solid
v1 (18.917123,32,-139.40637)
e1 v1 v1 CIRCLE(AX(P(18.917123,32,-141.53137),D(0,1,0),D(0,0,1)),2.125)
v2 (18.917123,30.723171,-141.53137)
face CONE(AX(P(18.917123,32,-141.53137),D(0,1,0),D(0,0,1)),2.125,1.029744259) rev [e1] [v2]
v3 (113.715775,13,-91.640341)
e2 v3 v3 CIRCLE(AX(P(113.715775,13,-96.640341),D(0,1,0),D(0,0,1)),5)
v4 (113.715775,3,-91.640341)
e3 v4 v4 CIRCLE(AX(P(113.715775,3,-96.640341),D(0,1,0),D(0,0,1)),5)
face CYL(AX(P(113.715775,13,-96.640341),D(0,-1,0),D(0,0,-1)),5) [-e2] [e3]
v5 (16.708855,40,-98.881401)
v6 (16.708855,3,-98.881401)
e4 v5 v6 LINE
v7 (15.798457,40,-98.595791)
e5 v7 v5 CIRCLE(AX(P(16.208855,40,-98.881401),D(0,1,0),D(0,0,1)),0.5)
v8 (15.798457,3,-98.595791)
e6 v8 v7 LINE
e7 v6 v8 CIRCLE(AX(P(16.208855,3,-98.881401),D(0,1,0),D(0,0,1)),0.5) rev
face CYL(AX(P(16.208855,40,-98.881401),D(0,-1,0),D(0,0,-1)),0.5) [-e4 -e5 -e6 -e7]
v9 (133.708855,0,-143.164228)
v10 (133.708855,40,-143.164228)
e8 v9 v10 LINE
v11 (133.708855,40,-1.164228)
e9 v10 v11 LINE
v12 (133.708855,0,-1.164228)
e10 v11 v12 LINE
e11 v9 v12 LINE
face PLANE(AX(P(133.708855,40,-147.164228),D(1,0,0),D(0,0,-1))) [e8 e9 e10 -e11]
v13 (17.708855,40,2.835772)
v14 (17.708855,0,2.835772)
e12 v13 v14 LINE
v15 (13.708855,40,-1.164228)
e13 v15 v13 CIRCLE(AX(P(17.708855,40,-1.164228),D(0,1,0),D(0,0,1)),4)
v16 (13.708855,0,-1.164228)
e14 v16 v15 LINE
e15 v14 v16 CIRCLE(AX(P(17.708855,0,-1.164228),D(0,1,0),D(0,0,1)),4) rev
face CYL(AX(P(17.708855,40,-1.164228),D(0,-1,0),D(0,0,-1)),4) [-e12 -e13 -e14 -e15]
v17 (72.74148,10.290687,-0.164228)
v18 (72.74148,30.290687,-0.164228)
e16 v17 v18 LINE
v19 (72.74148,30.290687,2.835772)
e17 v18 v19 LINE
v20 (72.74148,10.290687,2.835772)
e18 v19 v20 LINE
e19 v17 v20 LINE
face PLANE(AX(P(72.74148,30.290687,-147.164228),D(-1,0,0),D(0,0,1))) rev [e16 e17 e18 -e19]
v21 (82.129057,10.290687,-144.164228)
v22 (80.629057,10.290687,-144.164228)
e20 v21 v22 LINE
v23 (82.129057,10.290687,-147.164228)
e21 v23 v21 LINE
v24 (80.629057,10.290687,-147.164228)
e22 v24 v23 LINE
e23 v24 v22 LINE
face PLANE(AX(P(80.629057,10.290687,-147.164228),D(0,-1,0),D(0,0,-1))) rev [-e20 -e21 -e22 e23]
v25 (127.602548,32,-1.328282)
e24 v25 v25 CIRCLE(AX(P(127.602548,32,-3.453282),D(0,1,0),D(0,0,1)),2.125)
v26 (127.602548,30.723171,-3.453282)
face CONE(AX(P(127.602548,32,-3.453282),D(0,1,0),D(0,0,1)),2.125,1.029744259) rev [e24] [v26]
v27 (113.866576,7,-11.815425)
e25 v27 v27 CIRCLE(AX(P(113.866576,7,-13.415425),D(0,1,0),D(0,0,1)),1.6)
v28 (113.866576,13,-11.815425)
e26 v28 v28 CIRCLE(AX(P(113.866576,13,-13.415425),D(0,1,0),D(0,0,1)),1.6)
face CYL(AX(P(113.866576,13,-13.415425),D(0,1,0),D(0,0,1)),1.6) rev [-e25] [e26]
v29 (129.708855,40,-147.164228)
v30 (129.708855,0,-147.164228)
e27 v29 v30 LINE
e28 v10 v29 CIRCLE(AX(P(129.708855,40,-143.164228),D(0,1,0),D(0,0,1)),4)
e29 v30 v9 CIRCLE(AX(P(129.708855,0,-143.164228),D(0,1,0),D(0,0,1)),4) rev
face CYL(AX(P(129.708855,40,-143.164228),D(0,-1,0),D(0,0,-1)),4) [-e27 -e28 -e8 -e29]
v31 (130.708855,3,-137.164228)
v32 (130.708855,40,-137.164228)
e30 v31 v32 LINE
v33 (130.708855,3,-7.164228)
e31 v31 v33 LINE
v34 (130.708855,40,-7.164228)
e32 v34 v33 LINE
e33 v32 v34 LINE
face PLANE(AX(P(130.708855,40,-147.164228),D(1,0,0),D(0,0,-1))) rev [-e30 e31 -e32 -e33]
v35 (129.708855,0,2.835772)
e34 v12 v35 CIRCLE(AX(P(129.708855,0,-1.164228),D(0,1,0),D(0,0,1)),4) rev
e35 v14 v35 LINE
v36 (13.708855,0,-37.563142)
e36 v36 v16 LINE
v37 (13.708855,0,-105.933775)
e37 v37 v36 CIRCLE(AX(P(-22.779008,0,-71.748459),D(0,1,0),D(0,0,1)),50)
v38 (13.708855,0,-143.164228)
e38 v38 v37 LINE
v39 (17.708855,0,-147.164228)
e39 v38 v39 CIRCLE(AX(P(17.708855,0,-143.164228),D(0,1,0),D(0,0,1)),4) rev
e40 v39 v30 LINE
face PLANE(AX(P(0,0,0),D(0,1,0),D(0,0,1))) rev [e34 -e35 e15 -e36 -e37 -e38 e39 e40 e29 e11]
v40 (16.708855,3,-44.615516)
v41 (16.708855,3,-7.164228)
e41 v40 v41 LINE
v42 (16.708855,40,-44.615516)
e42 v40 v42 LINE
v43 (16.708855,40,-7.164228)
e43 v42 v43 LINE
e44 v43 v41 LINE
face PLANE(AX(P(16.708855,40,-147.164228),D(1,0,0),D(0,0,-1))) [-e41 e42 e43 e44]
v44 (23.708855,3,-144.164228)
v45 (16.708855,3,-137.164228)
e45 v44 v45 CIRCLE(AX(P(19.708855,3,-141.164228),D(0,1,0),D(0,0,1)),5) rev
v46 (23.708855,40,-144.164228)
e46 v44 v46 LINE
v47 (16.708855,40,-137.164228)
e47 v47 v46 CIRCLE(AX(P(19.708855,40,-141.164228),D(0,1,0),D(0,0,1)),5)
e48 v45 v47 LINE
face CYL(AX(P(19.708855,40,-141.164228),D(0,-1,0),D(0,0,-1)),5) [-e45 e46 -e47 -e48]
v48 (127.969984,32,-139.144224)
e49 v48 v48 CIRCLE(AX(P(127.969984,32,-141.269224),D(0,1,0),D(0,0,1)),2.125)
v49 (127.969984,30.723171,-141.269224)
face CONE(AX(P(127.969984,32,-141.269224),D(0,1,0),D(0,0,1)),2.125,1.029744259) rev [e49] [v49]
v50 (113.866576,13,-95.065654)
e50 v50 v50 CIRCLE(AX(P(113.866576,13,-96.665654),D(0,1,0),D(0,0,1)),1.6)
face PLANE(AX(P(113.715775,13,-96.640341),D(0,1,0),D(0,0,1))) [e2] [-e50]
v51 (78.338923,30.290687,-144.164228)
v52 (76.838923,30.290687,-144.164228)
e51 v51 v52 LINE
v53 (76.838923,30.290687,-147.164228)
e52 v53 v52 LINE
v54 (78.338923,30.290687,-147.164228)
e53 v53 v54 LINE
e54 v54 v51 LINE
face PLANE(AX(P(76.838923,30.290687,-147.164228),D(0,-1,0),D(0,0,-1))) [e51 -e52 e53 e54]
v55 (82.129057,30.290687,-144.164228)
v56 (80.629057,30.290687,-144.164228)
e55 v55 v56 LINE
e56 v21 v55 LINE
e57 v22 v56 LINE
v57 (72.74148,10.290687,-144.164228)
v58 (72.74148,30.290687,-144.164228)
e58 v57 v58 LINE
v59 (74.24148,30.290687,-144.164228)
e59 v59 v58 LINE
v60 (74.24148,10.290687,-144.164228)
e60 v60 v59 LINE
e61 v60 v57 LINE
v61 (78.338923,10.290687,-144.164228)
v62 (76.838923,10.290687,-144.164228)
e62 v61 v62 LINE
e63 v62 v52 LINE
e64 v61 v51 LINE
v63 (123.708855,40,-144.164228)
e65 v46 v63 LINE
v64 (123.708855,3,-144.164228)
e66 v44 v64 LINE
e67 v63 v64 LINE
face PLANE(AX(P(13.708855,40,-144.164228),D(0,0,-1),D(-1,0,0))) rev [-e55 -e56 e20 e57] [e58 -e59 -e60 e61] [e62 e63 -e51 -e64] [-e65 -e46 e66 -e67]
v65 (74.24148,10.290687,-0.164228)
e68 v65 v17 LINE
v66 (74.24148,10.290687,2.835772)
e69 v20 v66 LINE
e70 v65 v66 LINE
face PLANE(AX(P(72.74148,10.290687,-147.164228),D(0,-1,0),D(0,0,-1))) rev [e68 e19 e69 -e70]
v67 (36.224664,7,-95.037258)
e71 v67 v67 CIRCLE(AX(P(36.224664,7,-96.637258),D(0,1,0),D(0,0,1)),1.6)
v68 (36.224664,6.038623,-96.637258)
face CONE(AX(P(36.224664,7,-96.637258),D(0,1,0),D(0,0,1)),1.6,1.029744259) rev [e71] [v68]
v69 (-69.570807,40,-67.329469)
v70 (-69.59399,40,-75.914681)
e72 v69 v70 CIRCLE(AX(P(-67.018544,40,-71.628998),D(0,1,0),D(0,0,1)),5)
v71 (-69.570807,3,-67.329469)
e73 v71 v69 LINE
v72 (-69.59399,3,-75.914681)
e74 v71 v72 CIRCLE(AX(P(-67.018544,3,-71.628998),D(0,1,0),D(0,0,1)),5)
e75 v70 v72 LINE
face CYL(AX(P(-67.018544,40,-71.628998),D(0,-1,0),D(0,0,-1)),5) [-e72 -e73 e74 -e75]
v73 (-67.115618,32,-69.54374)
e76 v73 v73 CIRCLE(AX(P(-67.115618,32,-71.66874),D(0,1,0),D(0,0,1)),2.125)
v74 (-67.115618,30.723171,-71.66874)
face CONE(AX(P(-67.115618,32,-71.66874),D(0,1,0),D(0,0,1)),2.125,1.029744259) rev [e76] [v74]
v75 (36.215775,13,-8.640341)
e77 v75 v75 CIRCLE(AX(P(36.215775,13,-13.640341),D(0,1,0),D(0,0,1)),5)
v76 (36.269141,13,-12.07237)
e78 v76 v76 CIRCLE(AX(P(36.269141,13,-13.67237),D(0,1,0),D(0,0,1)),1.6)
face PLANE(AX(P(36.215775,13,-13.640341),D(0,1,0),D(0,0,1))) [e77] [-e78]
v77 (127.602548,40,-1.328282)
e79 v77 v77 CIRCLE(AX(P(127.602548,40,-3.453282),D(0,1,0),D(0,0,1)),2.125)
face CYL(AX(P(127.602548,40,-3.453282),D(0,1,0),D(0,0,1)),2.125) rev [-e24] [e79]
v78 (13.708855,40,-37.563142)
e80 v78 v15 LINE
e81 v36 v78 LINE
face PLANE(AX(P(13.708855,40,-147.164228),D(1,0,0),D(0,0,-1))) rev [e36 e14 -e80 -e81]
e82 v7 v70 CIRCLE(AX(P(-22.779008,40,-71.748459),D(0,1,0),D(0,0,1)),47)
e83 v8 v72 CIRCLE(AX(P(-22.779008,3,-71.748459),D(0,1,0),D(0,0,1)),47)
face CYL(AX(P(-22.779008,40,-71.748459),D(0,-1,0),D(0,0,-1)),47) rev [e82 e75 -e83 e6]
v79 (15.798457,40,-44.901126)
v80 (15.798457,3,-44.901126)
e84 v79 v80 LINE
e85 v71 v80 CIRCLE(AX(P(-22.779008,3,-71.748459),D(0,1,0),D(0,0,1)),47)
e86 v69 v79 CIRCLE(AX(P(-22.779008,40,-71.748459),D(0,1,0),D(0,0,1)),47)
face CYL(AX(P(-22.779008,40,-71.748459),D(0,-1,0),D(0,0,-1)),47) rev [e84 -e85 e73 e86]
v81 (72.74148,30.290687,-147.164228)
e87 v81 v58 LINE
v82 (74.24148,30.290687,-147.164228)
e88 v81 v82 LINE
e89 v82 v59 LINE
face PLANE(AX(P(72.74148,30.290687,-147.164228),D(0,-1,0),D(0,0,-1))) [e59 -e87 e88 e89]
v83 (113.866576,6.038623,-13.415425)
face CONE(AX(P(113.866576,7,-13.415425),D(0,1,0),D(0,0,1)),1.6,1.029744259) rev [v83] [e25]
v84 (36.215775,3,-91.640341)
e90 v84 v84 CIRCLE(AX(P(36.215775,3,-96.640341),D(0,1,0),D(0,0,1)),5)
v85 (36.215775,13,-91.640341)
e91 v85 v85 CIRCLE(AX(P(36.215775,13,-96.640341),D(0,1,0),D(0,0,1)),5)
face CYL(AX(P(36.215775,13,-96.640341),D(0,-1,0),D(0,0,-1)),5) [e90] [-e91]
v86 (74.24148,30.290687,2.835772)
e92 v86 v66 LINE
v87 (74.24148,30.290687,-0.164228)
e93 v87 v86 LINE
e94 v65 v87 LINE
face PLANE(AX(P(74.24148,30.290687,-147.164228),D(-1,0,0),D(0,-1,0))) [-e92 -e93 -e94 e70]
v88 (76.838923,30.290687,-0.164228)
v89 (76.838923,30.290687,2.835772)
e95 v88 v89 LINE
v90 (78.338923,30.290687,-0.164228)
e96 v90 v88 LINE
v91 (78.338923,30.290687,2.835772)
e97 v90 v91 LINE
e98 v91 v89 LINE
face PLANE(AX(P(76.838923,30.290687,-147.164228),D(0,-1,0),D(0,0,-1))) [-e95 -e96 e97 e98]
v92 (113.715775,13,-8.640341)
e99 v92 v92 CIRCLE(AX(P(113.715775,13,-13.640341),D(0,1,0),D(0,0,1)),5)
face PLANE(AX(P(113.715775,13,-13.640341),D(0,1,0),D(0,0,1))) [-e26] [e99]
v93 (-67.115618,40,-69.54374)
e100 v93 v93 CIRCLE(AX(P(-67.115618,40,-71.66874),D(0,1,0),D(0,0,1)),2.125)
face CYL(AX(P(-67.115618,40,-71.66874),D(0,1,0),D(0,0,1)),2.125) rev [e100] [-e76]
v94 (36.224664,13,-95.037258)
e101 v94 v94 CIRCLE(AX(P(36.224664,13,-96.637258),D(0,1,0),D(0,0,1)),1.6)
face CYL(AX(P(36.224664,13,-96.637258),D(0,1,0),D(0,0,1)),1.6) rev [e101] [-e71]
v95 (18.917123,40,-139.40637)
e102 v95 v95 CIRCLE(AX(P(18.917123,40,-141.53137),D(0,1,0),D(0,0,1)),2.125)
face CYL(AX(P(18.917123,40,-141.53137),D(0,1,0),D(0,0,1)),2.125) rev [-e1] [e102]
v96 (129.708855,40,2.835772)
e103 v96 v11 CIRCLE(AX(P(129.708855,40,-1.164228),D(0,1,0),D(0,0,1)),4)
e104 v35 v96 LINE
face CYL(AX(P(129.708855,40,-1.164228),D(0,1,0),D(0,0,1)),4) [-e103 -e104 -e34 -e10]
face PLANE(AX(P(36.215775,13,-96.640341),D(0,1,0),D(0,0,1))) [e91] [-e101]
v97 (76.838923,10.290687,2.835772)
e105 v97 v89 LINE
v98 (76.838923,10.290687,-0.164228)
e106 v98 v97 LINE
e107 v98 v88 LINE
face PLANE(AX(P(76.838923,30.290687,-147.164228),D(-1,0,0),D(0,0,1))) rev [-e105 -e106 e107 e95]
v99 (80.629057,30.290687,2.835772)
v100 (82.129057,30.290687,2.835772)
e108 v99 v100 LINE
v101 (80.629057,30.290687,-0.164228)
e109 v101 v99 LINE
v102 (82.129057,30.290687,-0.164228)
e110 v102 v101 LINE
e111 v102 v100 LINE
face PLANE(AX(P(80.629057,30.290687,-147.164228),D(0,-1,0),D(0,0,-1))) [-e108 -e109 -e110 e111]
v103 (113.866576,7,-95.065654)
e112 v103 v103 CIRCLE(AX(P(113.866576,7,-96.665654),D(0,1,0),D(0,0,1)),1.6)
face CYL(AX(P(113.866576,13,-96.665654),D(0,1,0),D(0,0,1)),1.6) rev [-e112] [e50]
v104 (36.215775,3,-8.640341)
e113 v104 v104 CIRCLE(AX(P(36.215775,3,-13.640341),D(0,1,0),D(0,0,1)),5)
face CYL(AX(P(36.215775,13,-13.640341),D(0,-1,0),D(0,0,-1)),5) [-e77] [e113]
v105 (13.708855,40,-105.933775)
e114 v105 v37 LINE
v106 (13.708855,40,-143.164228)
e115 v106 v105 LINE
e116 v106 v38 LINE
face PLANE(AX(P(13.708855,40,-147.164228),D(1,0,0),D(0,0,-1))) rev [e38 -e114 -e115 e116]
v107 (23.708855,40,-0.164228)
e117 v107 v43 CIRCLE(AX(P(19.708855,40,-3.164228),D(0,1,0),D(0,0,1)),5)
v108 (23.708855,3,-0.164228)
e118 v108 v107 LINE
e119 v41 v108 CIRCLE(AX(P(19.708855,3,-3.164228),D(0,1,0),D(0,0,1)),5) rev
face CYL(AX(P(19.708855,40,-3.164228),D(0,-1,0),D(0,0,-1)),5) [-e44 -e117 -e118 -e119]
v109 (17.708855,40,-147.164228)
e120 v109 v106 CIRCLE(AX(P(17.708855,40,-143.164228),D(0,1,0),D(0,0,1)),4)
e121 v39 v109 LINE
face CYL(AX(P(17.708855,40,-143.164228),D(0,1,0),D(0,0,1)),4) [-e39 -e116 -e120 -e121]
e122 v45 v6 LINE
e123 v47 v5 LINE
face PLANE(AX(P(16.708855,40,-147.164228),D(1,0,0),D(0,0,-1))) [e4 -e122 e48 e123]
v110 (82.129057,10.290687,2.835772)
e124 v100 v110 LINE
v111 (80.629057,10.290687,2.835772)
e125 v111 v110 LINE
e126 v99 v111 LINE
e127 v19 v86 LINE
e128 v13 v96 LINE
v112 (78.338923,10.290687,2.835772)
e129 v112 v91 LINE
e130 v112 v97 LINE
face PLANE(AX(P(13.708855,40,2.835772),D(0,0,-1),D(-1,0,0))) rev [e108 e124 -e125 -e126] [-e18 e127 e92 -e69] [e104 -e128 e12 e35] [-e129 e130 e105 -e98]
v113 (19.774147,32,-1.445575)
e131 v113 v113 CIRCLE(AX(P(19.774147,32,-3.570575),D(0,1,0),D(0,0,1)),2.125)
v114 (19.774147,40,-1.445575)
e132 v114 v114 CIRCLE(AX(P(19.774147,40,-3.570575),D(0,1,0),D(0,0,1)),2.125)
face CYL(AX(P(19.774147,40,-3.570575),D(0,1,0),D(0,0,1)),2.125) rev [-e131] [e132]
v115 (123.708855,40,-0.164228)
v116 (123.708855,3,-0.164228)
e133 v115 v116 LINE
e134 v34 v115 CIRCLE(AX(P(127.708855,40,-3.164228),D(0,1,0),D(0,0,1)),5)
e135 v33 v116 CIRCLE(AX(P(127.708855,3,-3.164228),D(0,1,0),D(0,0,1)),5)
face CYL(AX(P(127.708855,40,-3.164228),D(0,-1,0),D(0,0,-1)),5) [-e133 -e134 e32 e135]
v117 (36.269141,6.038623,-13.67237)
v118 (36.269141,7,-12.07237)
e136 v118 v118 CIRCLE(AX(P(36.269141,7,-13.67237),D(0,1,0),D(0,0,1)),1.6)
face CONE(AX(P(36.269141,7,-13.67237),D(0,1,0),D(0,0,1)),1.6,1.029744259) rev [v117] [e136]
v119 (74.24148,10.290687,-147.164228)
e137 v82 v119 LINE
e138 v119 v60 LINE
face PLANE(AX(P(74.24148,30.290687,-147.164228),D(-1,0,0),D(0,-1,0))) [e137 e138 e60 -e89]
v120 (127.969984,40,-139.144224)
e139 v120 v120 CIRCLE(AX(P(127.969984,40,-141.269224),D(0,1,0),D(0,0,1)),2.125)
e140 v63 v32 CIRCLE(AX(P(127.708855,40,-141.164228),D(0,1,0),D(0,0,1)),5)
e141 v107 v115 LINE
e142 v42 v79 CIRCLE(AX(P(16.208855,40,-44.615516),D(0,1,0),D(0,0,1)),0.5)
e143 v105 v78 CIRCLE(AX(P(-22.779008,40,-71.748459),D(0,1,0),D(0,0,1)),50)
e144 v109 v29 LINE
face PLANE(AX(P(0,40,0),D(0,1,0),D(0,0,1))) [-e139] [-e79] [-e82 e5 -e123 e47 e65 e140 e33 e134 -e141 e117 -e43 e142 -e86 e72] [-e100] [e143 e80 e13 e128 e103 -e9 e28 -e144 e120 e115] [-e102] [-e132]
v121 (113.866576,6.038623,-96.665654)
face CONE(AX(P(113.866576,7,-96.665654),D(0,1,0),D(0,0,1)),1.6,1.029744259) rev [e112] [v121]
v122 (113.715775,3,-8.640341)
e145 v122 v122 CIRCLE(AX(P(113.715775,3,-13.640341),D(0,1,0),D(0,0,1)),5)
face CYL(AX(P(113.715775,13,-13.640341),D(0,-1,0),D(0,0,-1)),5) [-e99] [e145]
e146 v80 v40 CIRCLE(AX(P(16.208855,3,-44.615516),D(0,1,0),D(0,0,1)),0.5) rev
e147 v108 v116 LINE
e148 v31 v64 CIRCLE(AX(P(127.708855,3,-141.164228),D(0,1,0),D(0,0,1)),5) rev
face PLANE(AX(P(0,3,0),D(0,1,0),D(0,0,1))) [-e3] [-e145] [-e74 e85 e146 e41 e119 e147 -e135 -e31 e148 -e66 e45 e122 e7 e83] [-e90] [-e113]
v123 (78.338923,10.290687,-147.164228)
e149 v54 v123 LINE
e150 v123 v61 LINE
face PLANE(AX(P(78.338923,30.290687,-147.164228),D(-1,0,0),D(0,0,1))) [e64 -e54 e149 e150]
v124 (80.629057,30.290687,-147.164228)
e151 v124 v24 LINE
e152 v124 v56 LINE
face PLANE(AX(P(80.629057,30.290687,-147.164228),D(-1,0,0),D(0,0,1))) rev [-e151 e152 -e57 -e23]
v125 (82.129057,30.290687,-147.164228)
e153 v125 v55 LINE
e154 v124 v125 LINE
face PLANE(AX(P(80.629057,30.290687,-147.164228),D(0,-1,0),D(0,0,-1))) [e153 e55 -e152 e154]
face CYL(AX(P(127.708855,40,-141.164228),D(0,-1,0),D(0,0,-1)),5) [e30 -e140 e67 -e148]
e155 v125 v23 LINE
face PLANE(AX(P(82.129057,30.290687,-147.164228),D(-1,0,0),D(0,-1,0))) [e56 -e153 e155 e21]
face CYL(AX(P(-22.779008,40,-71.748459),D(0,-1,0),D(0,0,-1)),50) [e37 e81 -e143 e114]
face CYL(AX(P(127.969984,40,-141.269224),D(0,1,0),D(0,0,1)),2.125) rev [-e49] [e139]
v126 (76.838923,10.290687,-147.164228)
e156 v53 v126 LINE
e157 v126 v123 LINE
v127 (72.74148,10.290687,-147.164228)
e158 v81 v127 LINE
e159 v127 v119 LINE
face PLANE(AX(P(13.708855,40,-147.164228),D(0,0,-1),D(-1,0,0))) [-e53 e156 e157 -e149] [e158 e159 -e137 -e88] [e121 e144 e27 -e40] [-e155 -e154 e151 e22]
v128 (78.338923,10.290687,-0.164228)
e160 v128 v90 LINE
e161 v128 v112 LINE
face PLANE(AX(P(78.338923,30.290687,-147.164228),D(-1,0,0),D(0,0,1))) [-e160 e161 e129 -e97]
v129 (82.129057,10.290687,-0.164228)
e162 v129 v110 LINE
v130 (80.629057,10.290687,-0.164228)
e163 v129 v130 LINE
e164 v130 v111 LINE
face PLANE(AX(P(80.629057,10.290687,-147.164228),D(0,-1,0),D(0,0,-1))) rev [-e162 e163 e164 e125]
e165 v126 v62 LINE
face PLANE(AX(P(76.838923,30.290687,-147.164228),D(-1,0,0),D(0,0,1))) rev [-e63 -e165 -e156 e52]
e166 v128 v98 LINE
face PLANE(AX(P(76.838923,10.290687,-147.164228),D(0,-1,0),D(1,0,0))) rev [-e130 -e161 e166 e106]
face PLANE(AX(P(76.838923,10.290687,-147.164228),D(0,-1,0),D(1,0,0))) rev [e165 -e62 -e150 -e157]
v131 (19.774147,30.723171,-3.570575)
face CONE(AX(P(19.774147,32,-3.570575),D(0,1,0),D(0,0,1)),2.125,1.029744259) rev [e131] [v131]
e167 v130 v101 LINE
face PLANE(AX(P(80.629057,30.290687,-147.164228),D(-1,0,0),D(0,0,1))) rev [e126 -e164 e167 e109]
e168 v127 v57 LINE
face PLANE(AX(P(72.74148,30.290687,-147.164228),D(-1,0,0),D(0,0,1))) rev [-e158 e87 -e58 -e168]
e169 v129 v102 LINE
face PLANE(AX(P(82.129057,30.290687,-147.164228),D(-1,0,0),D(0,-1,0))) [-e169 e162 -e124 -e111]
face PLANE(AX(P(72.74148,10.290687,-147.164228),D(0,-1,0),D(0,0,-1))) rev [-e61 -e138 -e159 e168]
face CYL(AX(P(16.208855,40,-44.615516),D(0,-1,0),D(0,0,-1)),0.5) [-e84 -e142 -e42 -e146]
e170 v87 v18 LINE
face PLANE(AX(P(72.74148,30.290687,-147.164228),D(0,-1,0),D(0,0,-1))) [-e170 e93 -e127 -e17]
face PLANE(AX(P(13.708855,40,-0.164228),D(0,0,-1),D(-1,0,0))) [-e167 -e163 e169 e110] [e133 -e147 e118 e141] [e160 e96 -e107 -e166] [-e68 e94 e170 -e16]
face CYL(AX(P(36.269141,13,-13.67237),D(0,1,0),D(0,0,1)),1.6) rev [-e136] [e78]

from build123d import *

# Parameters (mm, degrees)
SKETCH8_W                      = 120
SKETCH8_H                      = 150
BOSS_EXTRUDE3_DEPTH            = 40
SKETCH9_R                      = 50
BOSS_EXTRUDE4_DEPTH            = 40
SHELL1_START                   = 3
SHELL1_DEPTH                   = 37
FILLET2_R                      = 0.5
SKETCH17_R                     = 5
BOSS_EXTRUDE6_DEPTH            = 10
CUT_EXTRUDE9_DEPTH             = 203.818558951
CUT_EXTRUDE9_DEPTH_BACK        = 203.818558951
SKETCH11_W                     = 1.5
SKETCH11_H                     = 20
CUT_EXTRUDE10_DEPTH            = 205.88547515
CUT_EXTRUDE10_DEPTH_BACK       = 205.88547515
SKETCH12_W                     = 1.5
SKETCH12_H                     = 20
CUT_EXTRUDE11_DEPTH            = 203.818558951
CUT_EXTRUDE11_DEPTH_BACK       = 203.818558951
SKETCH15_W                     = 1.5
SKETCH15_H                     = 20
SKETCH28_R                     = 5
BOSS_EXTRUDE7_DEPTH            = 37
SKETCH29_R                     = 5
BOSS_EXTRUDE8_DEPTH            = 40
SKETCH30_R                     = 5
BOSS_EXTRUDE9_DEPTH            = 40
SKETCH31_R                     = 5
BOSS_EXTRUDE10_DEPTH           = 37
SKETCH32_R                     = 5
BOSS_EXTRUDE11_DEPTH           = 37
F_2_0_221_DIAMETER_HOLE1_D     = 4.25
F_2_0_221_DIAMETER_HOLE1_DEPTH = 8
F_2_0_221_DIAMETER_HOLE1_TIP   = 1.276828815
F_2_0_221_DIAMETER_HOLE2_D     = 3.2
F_2_0_221_DIAMETER_HOLE2_DEPTH = 6
F_2_0_221_DIAMETER_HOLE2_TIP   = 0.96137699
FILLET3_R                      = 4


# Read off the part's stored shape, not the designer's step: Shell1
with BuildPart() as part:
    # Sketch8 → Boss-Extrude3 (new body)
    with BuildSketch(Plane(origin=(0, 0, 0), x_dir=(1, 0, 0), z_dir=(0, 1, 0))):
        with Locations((73.708855083, 72.164227744)):
            Rectangle(SKETCH8_W, SKETCH8_H)
    extrude(amount=BOSS_EXTRUDE3_DEPTH)

    # Sketch9 → Boss-Extrude4 (add)
    with BuildSketch(Plane(origin=(0, 0, 0), x_dir=(1, 0, 0), z_dir=(0, 1, 0))):
        with Locations((-22.779007595, 71.748458752)):
            Circle(SKETCH9_R)
    extrude(amount=BOSS_EXTRUDE4_DEPTH)

    # Shell1 outline → Shell1 (cut)
    with BuildSketch(Plane(origin=(0, 0, 0), x_dir=(1, 0, 0), z_dir=(0, 1, 0)).offset(SHELL1_START)):
        with BuildLine():
            Line((16.708855083, 46.259074664), (16.708855083, 0.164227744))
            Line((16.708855083, 0.164227744), (130.708855083, 0.164227744))
            Line((130.708855083, 0.164227744), (130.708855083, 144.164227744))
            Line((130.708855083, 144.164227744), (16.708855083, 144.164227744))
            Line((16.708855083, 144.164227744), (16.708855083, 97.237842839))
            ThreePointArc((16.708855083, 97.237842839), (-69.779007595, 71.748458751), (16.708855083, 46.259074664))
        make_face()
    extrude(amount=SHELL1_DEPTH, mode=Mode.SUBTRACT)

    # Fillet2
    fillet2_edges = [part.edges().sort_by_distance(p)[0] for p in [
        (16.708855083, 21.5, -46.259074664),
        (16.708855083, 21.5, -97.237842839),
    ]]
    fillet(fillet2_edges, radius=FILLET2_R)

    # Sketch17 → Boss-Extrude6 (add)
    with BuildSketch(Plane(origin=(1.848761015, 3, -2.465014687), x_dir=(1, 0, 0), z_dir=(0, 1, 0))):
        with Locations(Location((111.867013496, 11.175325825, 0), (0, 0, 270))):
            Circle(SKETCH17_R)
        with Locations(Location((34.367013496, 11.175325825, 0), (0, 0, 270))):
            Circle(SKETCH17_R)
        with Locations(Location((111.867013496, 94.175325825, 0), (0, 0, 270))):
            Circle(SKETCH17_R)
        with Locations(Location((34.367013496, 94.175325825, 0), (0, 0, 270))):
            Circle(SKETCH17_R)
    extrude(amount=BOSS_EXTRUDE6_DEPTH)

    # Sketch11 → Cut-Extrude9 (cut, two sides: drawn at the far end of the back side and taken through both)
    with BuildSketch(Plane.XY.offset(-CUT_EXTRUDE9_DEPTH_BACK)):
        with Locations((73.491480368, 20.290686907)):
            Rectangle(SKETCH11_W, SKETCH11_H)
    extrude(amount=CUT_EXTRUDE9_DEPTH + CUT_EXTRUDE9_DEPTH_BACK, mode=Mode.SUBTRACT)

    # Sketch12 → Cut-Extrude10 (cut, two sides: drawn at the far end of the back side and taken through both)
    with BuildSketch(Plane.XY.offset(2.835772256).offset(-CUT_EXTRUDE10_DEPTH_BACK)):
        with Locations((77.588922832, 20.290686907)):
            Rectangle(SKETCH12_W, SKETCH12_H)
    extrude(amount=CUT_EXTRUDE10_DEPTH + CUT_EXTRUDE10_DEPTH_BACK, mode=Mode.SUBTRACT)

    # Sketch15 → Cut-Extrude11 (cut, two sides: drawn at the far end of the back side and taken through both)
    with BuildSketch(Plane.XY.offset(-CUT_EXTRUDE11_DEPTH_BACK)):
        with Locations((81.379057112, 20.290686907)):
            Rectangle(SKETCH15_W, SKETCH15_H)
    extrude(amount=CUT_EXTRUDE11_DEPTH + CUT_EXTRUDE11_DEPTH_BACK, mode=Mode.SUBTRACT)

    # Sketch28 → Boss-Extrude7 (add)
    with BuildSketch(Plane(origin=(0, 3, 0), x_dir=(1, 0, 0), z_dir=(0, 1, 0))):
        with Locations((19.708855083, 141.164227744)):
            Circle(SKETCH28_R)
    extrude(amount=BOSS_EXTRUDE7_DEPTH)

    # Sketch29 → Boss-Extrude8 (add)
    with BuildSketch(Plane(origin=(0, 0, 0), x_dir=(1, 0, 0), z_dir=(0, 1, 0))):
        with Locations((19.708855083, 3.164227744)):
            Circle(SKETCH29_R)
    extrude(amount=BOSS_EXTRUDE8_DEPTH)

    # Sketch30 → Boss-Extrude9 (add)
    with BuildSketch(Plane(origin=(0, 0, 0), x_dir=(1, 0, 0), z_dir=(0, 1, 0))):
        with Locations((127.708855083, 141.164227744)):
            Circle(SKETCH30_R)
    extrude(amount=BOSS_EXTRUDE9_DEPTH)

    # Sketch31 → Boss-Extrude10 (add)
    with BuildSketch(Plane(origin=(0, 3, 0), x_dir=(1, 0, 0), z_dir=(0, 1, 0))):
        with Locations((127.708855083, 3.164227744)):
            Circle(SKETCH31_R)
    extrude(amount=BOSS_EXTRUDE10_DEPTH)

    # Sketch32 → Boss-Extrude11 (add)
    with BuildSketch(Plane(origin=(0, 3, 0), x_dir=(1, 0, 0), z_dir=(0, 1, 0))):
        with Locations((-67.018543515, 71.628998297)):
            Circle(SKETCH32_R)
    extrude(amount=BOSS_EXTRUDE11_DEPTH)

    # #2 (0.221) Diameter Hole1
    with Locations(Plane(origin=(0, 40, 0), x_dir=(1, 0, 0), z_dir=(0, 1, 0))):
        with Locations((18.917123201, 141.531370062), (127.969984407, 141.269223761), (127.602547564, 3.45328248), (19.774147178, 3.570575466), (-67.115618064, 71.668740496)):
            Hole(F_2_0_221_DIAMETER_HOLE1_D / 2, depth=F_2_0_221_DIAMETER_HOLE1_DEPTH)
            with Locations((0, 0, -(F_2_0_221_DIAMETER_HOLE1_DEPTH + F_2_0_221_DIAMETER_HOLE1_TIP / 2))):  # 118° drill point
                Cone(0, F_2_0_221_DIAMETER_HOLE1_D / 2, F_2_0_221_DIAMETER_HOLE1_TIP, mode=Mode.SUBTRACT)

    # #2 (0.221) Diameter Hole2
    with Locations(Plane(origin=(0, 13, 0), x_dir=(1, 0, 0), z_dir=(0, 1, 0))):
        with Locations((113.866576204, 96.665654076), (36.269140625, 13.672370328), (113.866576204, 13.415425177), (36.224664422, 96.637257854)):
            Hole(F_2_0_221_DIAMETER_HOLE2_D / 2, depth=F_2_0_221_DIAMETER_HOLE2_DEPTH)
            with Locations((0, 0, -(F_2_0_221_DIAMETER_HOLE2_DEPTH + F_2_0_221_DIAMETER_HOLE2_TIP / 2))):  # 118° drill point
                Cone(0, F_2_0_221_DIAMETER_HOLE2_D / 2, F_2_0_221_DIAMETER_HOLE2_TIP, mode=Mode.SUBTRACT)

    # Fillet3
    fillet3_edges = [part.edges().sort_by_distance(p)[0] for p in [
        (13.708855083, 20, -147.164227744),
        (133.708855083, 20, -147.164227744),
        (133.708855083, 20, 2.835772256),
        (13.708855083, 20, 2.835772256),
    ]]
    fillet(fillet3_edges, radius=FILLET3_R)


solid = part.part
